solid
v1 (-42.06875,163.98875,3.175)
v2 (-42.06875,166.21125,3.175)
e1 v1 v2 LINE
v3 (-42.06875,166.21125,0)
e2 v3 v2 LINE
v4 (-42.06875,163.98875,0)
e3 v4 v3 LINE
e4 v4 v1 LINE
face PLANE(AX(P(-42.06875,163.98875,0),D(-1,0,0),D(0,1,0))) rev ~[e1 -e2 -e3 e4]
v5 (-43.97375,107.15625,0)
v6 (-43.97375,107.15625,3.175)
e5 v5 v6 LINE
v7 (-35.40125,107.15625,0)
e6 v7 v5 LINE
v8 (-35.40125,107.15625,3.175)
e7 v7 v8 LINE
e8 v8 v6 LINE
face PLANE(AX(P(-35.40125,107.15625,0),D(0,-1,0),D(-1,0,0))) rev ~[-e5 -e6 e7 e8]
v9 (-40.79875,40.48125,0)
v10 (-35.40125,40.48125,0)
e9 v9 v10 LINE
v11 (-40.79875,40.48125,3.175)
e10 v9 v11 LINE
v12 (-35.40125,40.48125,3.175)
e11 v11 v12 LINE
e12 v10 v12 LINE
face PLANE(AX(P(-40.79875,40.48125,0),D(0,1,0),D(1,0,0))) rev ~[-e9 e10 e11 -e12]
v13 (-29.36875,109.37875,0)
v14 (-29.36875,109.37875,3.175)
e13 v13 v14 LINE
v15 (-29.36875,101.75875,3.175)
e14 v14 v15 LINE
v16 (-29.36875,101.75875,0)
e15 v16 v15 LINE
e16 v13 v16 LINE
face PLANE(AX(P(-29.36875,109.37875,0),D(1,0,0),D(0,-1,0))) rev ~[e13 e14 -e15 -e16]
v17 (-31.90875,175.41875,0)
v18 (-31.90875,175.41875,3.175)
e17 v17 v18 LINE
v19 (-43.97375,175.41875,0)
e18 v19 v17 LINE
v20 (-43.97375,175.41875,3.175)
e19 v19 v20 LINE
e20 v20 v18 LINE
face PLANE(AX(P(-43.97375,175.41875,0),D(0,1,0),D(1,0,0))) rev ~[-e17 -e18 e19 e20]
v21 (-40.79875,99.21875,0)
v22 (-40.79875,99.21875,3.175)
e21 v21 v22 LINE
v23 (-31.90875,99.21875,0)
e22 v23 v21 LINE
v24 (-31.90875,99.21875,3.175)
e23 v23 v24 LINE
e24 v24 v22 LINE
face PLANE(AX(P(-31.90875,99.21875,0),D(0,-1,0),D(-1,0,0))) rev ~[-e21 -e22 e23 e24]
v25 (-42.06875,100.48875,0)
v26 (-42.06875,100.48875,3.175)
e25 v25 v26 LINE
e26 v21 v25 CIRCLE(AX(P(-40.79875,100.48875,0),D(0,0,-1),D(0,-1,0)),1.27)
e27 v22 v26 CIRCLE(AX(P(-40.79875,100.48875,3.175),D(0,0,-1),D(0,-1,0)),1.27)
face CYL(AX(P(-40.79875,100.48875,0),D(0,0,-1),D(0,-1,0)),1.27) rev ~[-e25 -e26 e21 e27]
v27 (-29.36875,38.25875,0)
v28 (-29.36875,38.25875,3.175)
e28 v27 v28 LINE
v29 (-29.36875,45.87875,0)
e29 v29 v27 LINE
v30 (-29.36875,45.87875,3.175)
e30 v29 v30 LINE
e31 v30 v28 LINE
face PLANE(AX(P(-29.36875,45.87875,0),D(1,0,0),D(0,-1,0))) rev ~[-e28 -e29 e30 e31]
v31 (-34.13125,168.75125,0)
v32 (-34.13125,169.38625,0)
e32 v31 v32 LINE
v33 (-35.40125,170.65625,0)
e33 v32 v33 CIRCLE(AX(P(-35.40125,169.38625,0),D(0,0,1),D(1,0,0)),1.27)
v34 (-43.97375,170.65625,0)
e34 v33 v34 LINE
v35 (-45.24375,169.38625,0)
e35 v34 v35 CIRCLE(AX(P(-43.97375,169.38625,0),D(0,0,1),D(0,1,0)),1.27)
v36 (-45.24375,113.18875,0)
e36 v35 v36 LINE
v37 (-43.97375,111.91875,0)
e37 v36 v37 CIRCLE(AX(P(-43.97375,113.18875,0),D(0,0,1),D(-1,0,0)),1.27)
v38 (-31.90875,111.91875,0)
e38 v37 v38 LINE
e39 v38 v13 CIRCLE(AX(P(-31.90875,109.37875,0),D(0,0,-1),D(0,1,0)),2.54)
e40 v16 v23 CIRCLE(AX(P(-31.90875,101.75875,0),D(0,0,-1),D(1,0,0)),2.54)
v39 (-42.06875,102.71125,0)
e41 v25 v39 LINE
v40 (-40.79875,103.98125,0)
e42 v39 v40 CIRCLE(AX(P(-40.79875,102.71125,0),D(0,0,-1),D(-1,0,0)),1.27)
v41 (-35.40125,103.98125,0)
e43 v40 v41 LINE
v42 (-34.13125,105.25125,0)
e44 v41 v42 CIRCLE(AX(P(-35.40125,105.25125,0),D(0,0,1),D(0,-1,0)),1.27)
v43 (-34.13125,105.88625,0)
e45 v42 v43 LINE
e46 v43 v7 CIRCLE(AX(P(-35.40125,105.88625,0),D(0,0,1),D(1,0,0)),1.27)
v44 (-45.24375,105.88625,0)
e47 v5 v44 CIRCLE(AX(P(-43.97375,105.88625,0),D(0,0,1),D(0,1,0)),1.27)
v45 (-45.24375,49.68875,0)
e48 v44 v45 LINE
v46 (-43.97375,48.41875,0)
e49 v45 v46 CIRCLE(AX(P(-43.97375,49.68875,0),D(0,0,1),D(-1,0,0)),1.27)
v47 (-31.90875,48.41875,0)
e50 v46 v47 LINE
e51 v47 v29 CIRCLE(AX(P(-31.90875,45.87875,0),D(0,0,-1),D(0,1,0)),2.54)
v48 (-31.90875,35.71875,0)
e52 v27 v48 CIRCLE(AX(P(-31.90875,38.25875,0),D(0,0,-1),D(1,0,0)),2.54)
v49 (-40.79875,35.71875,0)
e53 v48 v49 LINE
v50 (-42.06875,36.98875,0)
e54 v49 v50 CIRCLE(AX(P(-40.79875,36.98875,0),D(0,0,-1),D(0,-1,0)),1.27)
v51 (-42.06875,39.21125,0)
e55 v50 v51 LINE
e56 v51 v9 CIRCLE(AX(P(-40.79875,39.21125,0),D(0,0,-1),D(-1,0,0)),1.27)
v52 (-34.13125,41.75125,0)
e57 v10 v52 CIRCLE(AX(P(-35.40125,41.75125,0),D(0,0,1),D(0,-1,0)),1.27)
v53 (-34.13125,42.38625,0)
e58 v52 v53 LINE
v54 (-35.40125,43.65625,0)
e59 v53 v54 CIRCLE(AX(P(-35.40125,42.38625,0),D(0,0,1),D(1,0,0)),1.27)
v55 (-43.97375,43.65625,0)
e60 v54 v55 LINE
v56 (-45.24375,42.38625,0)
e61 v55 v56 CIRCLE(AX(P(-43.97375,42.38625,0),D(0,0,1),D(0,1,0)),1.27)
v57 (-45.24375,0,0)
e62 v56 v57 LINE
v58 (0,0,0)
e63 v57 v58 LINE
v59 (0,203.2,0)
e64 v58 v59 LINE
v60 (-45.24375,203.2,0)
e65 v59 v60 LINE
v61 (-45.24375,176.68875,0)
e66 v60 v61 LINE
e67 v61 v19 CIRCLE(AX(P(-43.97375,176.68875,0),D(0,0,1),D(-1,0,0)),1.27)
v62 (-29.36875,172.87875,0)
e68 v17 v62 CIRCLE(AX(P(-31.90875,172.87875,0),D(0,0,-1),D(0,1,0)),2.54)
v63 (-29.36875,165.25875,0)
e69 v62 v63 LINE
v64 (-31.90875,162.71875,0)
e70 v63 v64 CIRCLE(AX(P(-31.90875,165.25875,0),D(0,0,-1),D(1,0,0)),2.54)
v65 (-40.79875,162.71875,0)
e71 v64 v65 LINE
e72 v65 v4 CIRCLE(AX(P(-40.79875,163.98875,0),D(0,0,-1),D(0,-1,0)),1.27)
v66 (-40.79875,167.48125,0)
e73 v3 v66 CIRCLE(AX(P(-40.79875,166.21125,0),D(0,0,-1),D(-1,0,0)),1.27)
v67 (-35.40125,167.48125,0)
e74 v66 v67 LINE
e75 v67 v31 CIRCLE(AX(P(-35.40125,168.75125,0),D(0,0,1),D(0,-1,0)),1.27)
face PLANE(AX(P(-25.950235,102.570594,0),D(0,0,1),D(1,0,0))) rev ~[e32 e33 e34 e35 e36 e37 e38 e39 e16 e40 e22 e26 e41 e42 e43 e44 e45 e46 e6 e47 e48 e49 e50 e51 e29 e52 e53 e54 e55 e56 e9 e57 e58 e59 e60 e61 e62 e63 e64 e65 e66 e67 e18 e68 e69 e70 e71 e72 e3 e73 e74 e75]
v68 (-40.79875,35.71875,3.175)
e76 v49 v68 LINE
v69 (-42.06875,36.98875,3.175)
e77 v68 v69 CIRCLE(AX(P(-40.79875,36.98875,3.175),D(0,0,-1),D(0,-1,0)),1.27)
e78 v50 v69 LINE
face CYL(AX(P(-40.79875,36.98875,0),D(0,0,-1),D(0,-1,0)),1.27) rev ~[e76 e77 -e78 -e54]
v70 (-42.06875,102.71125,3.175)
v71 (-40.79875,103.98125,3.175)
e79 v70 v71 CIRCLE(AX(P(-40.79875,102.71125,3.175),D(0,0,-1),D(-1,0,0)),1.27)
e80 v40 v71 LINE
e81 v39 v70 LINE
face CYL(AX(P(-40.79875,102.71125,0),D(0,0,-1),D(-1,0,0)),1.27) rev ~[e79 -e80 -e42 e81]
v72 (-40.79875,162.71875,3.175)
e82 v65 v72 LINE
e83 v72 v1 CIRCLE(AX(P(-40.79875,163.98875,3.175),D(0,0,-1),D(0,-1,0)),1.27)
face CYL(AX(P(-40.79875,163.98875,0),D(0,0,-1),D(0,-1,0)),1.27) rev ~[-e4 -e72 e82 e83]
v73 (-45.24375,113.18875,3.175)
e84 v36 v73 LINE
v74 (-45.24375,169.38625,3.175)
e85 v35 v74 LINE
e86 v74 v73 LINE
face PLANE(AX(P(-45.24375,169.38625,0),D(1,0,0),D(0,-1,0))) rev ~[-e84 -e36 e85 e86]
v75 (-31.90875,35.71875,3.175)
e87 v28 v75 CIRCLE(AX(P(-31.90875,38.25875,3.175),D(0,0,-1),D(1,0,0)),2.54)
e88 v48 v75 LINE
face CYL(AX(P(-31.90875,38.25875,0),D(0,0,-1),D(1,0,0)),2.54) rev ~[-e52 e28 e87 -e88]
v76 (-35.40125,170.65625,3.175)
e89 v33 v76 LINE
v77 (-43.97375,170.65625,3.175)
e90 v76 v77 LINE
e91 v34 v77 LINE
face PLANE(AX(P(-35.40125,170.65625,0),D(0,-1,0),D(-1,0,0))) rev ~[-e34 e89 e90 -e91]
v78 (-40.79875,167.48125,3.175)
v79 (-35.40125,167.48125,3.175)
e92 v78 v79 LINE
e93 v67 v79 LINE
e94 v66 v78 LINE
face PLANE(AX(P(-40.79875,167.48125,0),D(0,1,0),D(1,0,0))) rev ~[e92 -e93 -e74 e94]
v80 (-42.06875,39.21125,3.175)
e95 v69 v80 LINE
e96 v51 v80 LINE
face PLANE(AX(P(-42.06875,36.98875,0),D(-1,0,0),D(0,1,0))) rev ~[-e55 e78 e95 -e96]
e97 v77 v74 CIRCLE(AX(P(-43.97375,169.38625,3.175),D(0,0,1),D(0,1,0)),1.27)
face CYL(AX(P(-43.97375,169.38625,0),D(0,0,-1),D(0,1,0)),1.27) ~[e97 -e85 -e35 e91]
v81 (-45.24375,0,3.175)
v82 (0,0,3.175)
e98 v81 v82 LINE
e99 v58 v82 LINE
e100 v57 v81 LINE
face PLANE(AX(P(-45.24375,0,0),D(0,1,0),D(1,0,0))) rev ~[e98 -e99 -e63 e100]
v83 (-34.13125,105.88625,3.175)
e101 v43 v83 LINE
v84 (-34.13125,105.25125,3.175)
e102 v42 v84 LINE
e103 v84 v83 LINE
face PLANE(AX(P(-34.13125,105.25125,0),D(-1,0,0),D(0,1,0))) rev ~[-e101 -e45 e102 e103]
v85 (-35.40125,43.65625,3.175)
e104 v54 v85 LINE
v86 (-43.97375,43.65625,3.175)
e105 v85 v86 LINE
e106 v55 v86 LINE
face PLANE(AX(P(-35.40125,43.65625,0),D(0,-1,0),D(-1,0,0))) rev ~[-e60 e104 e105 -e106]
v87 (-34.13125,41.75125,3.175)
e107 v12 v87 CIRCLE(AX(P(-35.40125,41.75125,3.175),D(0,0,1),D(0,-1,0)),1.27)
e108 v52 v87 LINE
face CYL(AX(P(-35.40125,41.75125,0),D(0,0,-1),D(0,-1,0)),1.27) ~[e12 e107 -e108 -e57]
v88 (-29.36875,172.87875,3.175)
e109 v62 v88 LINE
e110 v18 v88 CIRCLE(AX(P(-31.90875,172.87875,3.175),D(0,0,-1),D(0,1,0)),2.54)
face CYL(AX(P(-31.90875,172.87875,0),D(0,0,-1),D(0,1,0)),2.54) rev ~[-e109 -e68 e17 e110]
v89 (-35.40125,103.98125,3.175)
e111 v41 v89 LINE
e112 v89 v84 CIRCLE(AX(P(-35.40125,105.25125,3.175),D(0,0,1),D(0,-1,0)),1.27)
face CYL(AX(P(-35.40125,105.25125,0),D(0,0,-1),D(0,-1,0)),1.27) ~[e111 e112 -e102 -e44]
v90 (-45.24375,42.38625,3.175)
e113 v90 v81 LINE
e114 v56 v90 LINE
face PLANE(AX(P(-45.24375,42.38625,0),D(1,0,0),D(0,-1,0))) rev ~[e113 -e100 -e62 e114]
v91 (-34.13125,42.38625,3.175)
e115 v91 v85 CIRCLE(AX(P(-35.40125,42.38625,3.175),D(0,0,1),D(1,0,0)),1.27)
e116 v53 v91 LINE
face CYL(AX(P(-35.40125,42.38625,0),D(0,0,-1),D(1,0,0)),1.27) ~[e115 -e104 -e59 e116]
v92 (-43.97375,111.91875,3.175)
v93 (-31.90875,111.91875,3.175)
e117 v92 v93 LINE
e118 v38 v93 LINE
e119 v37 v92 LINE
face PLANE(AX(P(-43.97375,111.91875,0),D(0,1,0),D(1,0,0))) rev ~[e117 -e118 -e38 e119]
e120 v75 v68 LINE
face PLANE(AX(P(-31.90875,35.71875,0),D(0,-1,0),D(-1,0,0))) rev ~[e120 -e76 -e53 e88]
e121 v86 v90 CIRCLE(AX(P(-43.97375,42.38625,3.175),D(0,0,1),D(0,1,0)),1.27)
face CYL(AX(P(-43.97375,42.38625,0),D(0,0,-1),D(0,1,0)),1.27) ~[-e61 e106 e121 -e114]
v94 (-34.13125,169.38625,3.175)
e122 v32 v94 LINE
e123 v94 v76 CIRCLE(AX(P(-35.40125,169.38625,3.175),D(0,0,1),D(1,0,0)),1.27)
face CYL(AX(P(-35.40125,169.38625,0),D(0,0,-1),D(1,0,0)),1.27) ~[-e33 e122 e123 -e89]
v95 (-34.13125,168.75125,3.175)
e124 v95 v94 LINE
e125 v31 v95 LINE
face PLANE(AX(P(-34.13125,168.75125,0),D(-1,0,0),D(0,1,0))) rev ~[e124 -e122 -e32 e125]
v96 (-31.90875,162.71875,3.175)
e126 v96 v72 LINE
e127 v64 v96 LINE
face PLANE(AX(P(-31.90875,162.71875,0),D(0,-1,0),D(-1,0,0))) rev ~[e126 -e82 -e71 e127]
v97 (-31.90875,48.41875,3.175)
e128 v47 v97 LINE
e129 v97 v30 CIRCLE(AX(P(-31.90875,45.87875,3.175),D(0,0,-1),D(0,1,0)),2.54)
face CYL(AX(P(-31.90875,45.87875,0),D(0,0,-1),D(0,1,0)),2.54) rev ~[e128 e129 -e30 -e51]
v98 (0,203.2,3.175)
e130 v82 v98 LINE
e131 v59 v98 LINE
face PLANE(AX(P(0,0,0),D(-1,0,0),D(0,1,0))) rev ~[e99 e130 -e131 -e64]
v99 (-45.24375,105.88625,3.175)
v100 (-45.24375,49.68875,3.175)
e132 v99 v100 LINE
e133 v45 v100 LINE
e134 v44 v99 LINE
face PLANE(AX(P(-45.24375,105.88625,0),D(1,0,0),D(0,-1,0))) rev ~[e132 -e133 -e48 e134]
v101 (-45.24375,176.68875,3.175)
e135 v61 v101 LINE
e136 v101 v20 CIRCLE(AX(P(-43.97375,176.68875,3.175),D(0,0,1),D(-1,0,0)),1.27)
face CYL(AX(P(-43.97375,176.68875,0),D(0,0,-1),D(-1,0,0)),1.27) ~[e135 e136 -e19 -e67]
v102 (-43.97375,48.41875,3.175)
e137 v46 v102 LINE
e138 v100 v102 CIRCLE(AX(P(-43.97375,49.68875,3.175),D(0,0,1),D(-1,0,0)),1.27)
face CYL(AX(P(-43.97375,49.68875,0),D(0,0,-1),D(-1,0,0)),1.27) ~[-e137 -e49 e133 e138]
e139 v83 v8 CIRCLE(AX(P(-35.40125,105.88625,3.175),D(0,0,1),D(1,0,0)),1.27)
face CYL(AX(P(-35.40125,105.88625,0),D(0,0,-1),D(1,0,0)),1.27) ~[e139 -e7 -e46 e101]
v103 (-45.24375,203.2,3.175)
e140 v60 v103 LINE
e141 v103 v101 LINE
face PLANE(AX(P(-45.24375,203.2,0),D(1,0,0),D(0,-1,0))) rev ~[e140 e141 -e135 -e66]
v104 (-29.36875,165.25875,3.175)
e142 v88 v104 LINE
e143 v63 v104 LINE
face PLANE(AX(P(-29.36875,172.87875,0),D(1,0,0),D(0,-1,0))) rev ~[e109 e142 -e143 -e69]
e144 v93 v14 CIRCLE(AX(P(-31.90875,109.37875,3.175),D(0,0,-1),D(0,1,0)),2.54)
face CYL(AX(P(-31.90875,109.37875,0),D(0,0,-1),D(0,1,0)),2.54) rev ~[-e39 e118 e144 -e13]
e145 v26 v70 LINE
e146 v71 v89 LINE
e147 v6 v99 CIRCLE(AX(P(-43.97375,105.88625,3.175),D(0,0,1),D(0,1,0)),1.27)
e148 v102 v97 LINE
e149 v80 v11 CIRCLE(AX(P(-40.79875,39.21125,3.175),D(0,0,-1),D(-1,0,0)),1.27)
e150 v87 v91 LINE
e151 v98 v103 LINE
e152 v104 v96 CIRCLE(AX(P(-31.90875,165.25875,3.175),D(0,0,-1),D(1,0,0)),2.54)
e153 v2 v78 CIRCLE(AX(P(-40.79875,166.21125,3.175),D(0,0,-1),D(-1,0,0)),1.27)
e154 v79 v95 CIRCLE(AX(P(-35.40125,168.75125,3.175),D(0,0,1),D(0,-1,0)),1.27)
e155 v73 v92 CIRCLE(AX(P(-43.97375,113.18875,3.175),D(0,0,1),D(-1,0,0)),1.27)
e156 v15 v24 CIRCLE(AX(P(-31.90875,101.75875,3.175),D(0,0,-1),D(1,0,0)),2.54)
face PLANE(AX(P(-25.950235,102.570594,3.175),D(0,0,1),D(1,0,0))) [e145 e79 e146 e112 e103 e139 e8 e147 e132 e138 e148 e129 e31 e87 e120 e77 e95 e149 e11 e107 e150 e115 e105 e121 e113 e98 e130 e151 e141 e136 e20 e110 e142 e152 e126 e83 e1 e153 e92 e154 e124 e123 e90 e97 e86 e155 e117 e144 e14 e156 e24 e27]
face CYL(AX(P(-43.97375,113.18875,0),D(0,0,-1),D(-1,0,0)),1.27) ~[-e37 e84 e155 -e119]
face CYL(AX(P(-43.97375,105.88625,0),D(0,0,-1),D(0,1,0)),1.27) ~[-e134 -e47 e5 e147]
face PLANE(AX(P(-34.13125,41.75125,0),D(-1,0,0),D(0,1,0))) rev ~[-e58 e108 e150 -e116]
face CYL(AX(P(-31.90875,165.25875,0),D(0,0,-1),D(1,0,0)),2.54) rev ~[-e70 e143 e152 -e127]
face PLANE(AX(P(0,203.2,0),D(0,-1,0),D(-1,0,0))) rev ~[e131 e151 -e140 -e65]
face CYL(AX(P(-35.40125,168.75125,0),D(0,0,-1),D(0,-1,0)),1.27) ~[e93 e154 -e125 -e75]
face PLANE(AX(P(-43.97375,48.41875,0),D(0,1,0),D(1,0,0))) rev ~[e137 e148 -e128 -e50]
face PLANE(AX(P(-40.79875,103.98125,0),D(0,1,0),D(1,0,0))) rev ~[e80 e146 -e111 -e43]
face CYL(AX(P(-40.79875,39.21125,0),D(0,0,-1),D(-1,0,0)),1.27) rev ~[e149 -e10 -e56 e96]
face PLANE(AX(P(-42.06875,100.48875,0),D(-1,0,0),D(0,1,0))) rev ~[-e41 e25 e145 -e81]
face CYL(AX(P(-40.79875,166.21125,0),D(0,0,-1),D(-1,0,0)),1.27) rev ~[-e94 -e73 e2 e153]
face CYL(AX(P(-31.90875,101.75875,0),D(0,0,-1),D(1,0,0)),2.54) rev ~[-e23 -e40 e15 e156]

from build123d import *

# Parameters (mm, degrees)
F1_DEPTH = 3.175


# Not quite as in the source:
# - a length typed as a fraction of an inch, garbled in the dataset ("3 / 203.2 mm" for 3/8 in), is restored


with BuildPart() as f1:
    # F0 (on Top) → F1 (new body)
    with BuildSketch(Plane.XY):
        with BuildLine():
            Line((0, 0), (0, 203.2))
            Line((0, 203.2), (-45.24375, 203.2))
            Line((-45.24375, 203.2), (-45.24375, 176.68875))
            ThreePointArc((-45.24375, 176.68875), (-44.8717756121, 175.7907243879), (-43.97375, 175.41875))
            Line((-43.97375, 175.41875), (-31.90875, 175.41875))
            ThreePointArc((-31.90875, 175.41875), (-30.1126987758, 174.6748012242), (-29.36875, 172.87875))
            Line((-29.36875, 172.87875), (-29.36875, 165.25875))
            ThreePointArc((-29.36875, 165.25875), (-30.1126987758, 163.4626987758), (-31.90875, 162.71875))
            Line((-31.90875, 162.71875), (-40.79875, 162.71875))
            ThreePointArc((-40.79875, 162.71875), (-41.6967756121, 163.0907243879), (-42.06875, 163.98875))
            Line((-42.06875, 163.98875), (-42.06875, 166.21125))
            ThreePointArc((-42.06875, 166.21125), (-41.6967756121, 167.1092756121), (-40.79875, 167.48125))
            Line((-40.79875, 167.48125), (-35.40125, 167.48125))
            ThreePointArc((-35.40125, 167.48125), (-34.5032243879, 167.8532243879), (-34.13125, 168.75125))
            Line((-34.13125, 168.75125), (-34.13125, 169.38625))
            ThreePointArc((-34.13125, 169.38625), (-34.5032243879, 170.2842756121), (-35.40125, 170.65625))
            Line((-35.40125, 170.65625), (-43.97375, 170.65625))
            ThreePointArc((-43.97375, 170.65625), (-44.8717756121, 170.2842756121), (-45.24375, 169.38625))
            Line((-45.24375, 169.38625), (-45.24375, 113.18875))
            ThreePointArc((-45.24375, 113.18875), (-44.8717756121, 112.2907243879), (-43.97375, 111.91875))
            Line((-43.97375, 111.91875), (-31.90875, 111.91875))
            ThreePointArc((-31.90875, 111.91875), (-30.1126987758, 111.1748012242), (-29.36875, 109.37875))
            Line((-29.36875, 109.37875), (-29.36875, 101.75875))
            ThreePointArc((-29.36875, 101.75875), (-30.1126987758, 99.9626987758), (-31.90875, 99.21875))
            Line((-31.90875, 99.21875), (-40.79875, 99.21875))
            ThreePointArc((-40.79875, 99.21875), (-41.6967756121, 99.5907243879), (-42.06875, 100.48875))
            Line((-42.06875, 100.48875), (-42.06875, 102.71125))
            ThreePointArc((-42.06875, 102.71125), (-41.6967756121, 103.6092756121), (-40.79875, 103.98125))
            Line((-40.79875, 103.98125), (-35.40125, 103.98125))
            ThreePointArc((-35.40125, 103.98125), (-34.5032243879, 104.3532243879), (-34.13125, 105.25125))
            Line((-34.13125, 105.25125), (-34.13125, 105.88625))
            ThreePointArc((-34.13125, 105.88625), (-34.5032243879, 106.7842756121), (-35.40125, 107.15625))
            Line((-35.40125, 107.15625), (-43.97375, 107.15625))
            ThreePointArc((-43.97375, 107.15625), (-44.8717756121, 106.7842756121), (-45.24375, 105.88625))
            Line((-45.24375, 105.88625), (-45.24375, 49.68875))
            ThreePointArc((-45.24375, 49.68875), (-44.8717756121, 48.7907243879), (-43.97375, 48.41875))
            Line((-43.97375, 48.41875), (-31.90875, 48.41875))
            ThreePointArc((-31.90875, 48.41875), (-30.1126987758, 47.6748012242), (-29.36875, 45.87875))
            Line((-29.36875, 45.87875), (-29.36875, 38.25875))
            ThreePointArc((-29.36875, 38.25875), (-30.1126987758, 36.4626987758), (-31.90875, 35.71875))
            Line((-31.90875, 35.71875), (-40.79875, 35.71875))
            ThreePointArc((-40.79875, 35.71875), (-41.6967756121, 36.0907243879), (-42.06875, 36.98875))
            Line((-42.06875, 36.98875), (-42.06875, 39.21125))
            ThreePointArc((-42.06875, 39.21125), (-41.6967756121, 40.1092756121), (-40.79875, 40.48125))
            Line((-40.79875, 40.48125), (-35.40125, 40.48125))
            ThreePointArc((-35.40125, 40.48125), (-34.5032243879, 40.8532243879), (-34.13125, 41.75125))
            Line((-34.13125, 41.75125), (-34.13125, 42.38625))
            ThreePointArc((-34.13125, 42.38625), (-34.5032243879, 43.2842756121), (-35.40125, 43.65625))
            Line((-35.40125, 43.65625), (-43.97375, 43.65625))
            ThreePointArc((-43.97375, 43.65625), (-44.8717756121, 43.2842756121), (-45.24375, 42.38625))
            Line((-45.24375, 42.38625), (-45.24375, 0))
            Line((-45.24375, 0), (0, 0))
        make_face()
    extrude(amount=F1_DEPTH)


solid = f1.part
